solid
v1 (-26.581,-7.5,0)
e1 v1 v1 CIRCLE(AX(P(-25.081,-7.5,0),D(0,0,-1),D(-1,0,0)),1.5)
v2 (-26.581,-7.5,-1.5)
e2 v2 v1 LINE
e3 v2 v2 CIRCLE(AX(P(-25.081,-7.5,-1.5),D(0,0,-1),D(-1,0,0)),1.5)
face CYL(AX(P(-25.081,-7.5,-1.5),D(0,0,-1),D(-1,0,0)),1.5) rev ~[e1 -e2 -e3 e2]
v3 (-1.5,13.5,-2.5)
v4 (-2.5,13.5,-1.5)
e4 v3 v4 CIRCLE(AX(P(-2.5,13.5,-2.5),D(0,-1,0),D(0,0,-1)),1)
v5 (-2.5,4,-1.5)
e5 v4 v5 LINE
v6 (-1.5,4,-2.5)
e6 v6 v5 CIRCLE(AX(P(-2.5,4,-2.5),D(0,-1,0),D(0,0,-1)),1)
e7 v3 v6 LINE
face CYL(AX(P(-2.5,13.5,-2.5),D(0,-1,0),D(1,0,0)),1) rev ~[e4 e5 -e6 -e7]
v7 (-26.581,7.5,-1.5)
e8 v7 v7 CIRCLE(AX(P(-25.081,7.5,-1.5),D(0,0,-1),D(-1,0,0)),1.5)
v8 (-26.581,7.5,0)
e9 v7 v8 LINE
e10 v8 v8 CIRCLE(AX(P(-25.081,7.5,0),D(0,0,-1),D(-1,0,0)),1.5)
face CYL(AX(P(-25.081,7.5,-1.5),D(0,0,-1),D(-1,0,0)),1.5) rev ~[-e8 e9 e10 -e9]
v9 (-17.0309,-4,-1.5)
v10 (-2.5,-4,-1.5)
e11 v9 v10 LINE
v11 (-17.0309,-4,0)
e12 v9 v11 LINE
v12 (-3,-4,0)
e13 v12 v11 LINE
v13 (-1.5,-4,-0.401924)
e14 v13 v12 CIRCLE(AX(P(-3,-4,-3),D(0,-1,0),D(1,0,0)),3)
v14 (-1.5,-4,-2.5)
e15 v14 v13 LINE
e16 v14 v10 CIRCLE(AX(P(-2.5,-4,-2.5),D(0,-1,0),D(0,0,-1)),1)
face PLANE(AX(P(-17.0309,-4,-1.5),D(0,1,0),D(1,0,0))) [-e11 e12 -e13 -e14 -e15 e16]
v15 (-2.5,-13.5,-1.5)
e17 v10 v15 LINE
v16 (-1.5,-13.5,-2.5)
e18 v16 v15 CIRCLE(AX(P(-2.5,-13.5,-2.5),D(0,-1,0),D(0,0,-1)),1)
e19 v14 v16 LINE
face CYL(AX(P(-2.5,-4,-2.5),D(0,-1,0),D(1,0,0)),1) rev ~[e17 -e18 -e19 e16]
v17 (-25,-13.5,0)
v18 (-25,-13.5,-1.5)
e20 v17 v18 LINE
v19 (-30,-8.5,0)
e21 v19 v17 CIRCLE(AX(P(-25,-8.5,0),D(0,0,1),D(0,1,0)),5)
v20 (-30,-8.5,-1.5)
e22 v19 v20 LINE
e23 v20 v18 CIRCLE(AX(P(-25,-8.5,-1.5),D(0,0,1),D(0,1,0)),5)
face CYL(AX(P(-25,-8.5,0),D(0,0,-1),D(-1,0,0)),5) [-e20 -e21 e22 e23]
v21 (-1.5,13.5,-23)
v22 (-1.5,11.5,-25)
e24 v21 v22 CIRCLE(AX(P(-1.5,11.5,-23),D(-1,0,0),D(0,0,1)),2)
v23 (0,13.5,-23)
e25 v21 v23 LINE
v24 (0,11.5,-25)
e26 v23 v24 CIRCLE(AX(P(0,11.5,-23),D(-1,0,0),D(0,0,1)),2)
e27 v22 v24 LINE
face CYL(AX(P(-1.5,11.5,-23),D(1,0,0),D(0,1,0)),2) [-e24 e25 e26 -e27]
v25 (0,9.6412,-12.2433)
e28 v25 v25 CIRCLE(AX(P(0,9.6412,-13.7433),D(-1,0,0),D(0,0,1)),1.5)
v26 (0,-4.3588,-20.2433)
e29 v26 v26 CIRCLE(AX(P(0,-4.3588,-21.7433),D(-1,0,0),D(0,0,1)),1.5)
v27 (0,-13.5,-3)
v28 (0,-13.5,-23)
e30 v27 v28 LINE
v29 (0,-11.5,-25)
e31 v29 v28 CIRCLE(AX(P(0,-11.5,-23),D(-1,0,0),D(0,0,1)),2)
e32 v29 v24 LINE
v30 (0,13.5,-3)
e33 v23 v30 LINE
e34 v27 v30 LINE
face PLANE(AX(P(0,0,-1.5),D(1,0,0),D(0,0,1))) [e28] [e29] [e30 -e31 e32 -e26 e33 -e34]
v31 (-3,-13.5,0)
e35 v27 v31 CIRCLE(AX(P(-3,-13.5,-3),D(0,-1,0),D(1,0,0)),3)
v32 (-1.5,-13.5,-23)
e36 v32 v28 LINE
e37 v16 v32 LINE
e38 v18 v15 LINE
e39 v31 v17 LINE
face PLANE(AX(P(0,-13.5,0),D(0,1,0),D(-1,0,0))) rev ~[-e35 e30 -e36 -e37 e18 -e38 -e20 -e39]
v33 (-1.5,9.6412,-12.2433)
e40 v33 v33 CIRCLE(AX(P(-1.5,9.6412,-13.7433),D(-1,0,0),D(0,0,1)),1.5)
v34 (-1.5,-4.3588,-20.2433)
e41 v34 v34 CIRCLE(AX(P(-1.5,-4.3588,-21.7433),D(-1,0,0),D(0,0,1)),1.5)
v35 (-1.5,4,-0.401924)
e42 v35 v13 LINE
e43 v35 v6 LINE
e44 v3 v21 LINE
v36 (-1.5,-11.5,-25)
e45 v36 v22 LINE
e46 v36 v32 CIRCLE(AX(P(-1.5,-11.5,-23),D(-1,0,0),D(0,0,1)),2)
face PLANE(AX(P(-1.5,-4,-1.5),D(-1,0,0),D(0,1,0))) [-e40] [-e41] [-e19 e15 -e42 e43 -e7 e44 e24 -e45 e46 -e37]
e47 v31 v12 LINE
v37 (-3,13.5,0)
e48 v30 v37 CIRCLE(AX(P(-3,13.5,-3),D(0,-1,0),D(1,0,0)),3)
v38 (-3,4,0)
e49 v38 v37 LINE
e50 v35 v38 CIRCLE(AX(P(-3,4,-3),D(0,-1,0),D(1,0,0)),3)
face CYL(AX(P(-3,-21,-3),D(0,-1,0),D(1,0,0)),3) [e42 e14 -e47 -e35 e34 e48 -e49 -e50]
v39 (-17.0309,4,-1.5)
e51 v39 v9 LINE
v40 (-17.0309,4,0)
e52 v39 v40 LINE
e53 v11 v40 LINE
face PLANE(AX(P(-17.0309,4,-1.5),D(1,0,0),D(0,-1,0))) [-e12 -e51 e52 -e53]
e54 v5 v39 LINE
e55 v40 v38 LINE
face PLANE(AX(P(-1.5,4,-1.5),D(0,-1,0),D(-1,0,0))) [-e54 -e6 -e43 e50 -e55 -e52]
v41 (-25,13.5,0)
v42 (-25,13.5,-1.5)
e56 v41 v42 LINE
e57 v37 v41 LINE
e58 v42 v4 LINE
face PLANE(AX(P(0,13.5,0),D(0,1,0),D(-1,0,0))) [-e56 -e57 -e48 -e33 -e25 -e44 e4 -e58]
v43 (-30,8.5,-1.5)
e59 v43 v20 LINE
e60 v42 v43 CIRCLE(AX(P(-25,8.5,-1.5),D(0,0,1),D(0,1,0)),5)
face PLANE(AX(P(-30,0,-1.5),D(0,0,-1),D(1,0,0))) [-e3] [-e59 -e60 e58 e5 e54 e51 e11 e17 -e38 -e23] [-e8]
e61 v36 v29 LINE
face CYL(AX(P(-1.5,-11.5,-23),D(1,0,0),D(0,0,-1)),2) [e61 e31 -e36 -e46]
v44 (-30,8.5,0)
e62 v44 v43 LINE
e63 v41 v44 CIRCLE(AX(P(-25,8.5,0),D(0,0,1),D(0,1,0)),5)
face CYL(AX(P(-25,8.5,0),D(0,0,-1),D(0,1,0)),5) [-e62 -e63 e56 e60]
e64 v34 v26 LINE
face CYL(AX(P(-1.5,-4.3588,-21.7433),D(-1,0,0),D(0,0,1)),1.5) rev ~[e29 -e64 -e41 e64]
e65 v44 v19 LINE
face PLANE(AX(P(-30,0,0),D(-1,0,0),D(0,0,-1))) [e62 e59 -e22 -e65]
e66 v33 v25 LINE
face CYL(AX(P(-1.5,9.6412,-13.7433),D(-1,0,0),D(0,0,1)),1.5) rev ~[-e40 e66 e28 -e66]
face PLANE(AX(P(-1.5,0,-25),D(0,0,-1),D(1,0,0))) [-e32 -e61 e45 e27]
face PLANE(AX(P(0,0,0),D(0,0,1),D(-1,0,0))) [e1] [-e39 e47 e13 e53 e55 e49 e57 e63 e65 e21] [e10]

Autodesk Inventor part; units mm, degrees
ref_plane "YZ Plane" through (0, 0, 0) normal (1, 0, 0) x (0, 1, 0)
ref_plane "XZ Plane" through (0, 0, 0) normal (0, 1, 0) x (-1, 0, 0)
ref_plane "XY Plane" through (0, 0, 0) normal (0, 0, 1) x (1, 0, 0)
sketch "Эскиз1" plane through (0, 0, 0) normal (0, 1, 0) x (-1, 0, 0)
  line L0 (0, 0) -> (30, 0)
  line L1 (30, 0) -> (30, -1.5)
  line L2 (30, -1.5) -> (0, -1.5)
  line L3 (0, -1.5) -> (0, 0)
  line L4 (0, -1.5) -> (1.5, -1.5)
  line L5 (1.5, -1.5) -> (1.5, -25)
  line L6 (1.5, -25) -> (0, -25)
  line L7 (0, -25) -> (0, -1.5)
  dimension "d0" = 1.5
  dimension "d1" = 25
  dimension "d2" = 30
  dimension "d3" = 1.5
extrude "Выдавливание1" add sketch "Эскиз1" along normal mid plane 27
sketch "Эскиз2" plane through (-1.5, -13.5, -1.5) normal (0, 0, -1) x (-1, 0, 0)
  line L0 (28.5, 27) -> (-1.5, 27) construction
  line L1 (23.581, 27) -> (23.581, 0.3508) construction
  line L2 (28.5, 0) -> (28.5, 27) construction
  line L3 (28.5, 13.5) -> (-1.5, 13.5) construction
  circle A0 centre (23.581, 21) radius 1.5
  circle A1 centre (23.581, 6) radius 1.5
  line L4 (0, 0) -> (0, 27) projected
  line L5 (0, 17.5) -> (15.5309, 17.5)
  line L6 (15.5309, 17.5) -> (15.5309, 9.5)
  line L7 (15.5309, 9.5) -> (0, 9.5)
  line L8 (0, 9.5) -> (0, 17.5)
  line L9 (28.5, 0) -> (0, 0) projected
  dimension "d6" = 3
  dimension "d7" = 3
  dimension "d8" = 15
  dimension "d9" = 7.5
  dimension "d10" = 9.5
  dimension "d11" = 15.5309
  dimension "d12" = 9.5
extrude "Выдавливание2" cut sketch "Эскиз2" against normal blind 27 contours L4 L5 L6 L7
fillet "Сопряжение1" radius 1 2 edges at (-1.5, 8.75, -1.5) (-1.5, -8.75, -1.5)
fillet "Сопряжение2" radius 3 1 edges at (0, 0, 0)
extrude "Выдавливание3" cut sketch "Эскиз2" against normal blind 27 contours A0 | A1
sketch "Эскиз3" plane through (-1.5, -13.5, -25) normal (-1, 0, 0) x (0, 0, 1)
  circle A0 centre (3.2567, 9.1412) radius 1.5
  circle A1 centre (11.2567, 23.1412) radius 1.5
  point P0 (25, 13.5)
  dimension "d19" = 3
  dimension "d20" = 3
  dimension "d23" = 14
  dimension "d24" = 8
extrude "Выдавливание4" cut sketch "Эскиз3" against normal blind 27
fillet "Сопряжение3" radius 5 2 edges at (-30, -13.5, -0.75) (-30, 13.5, -0.75)
fillet "Сопряжение4" radius 2 2 edges at (-0.75, -13.5, -25) (-0.75, 13.5, -25)
properties part number "крепление концевика"
